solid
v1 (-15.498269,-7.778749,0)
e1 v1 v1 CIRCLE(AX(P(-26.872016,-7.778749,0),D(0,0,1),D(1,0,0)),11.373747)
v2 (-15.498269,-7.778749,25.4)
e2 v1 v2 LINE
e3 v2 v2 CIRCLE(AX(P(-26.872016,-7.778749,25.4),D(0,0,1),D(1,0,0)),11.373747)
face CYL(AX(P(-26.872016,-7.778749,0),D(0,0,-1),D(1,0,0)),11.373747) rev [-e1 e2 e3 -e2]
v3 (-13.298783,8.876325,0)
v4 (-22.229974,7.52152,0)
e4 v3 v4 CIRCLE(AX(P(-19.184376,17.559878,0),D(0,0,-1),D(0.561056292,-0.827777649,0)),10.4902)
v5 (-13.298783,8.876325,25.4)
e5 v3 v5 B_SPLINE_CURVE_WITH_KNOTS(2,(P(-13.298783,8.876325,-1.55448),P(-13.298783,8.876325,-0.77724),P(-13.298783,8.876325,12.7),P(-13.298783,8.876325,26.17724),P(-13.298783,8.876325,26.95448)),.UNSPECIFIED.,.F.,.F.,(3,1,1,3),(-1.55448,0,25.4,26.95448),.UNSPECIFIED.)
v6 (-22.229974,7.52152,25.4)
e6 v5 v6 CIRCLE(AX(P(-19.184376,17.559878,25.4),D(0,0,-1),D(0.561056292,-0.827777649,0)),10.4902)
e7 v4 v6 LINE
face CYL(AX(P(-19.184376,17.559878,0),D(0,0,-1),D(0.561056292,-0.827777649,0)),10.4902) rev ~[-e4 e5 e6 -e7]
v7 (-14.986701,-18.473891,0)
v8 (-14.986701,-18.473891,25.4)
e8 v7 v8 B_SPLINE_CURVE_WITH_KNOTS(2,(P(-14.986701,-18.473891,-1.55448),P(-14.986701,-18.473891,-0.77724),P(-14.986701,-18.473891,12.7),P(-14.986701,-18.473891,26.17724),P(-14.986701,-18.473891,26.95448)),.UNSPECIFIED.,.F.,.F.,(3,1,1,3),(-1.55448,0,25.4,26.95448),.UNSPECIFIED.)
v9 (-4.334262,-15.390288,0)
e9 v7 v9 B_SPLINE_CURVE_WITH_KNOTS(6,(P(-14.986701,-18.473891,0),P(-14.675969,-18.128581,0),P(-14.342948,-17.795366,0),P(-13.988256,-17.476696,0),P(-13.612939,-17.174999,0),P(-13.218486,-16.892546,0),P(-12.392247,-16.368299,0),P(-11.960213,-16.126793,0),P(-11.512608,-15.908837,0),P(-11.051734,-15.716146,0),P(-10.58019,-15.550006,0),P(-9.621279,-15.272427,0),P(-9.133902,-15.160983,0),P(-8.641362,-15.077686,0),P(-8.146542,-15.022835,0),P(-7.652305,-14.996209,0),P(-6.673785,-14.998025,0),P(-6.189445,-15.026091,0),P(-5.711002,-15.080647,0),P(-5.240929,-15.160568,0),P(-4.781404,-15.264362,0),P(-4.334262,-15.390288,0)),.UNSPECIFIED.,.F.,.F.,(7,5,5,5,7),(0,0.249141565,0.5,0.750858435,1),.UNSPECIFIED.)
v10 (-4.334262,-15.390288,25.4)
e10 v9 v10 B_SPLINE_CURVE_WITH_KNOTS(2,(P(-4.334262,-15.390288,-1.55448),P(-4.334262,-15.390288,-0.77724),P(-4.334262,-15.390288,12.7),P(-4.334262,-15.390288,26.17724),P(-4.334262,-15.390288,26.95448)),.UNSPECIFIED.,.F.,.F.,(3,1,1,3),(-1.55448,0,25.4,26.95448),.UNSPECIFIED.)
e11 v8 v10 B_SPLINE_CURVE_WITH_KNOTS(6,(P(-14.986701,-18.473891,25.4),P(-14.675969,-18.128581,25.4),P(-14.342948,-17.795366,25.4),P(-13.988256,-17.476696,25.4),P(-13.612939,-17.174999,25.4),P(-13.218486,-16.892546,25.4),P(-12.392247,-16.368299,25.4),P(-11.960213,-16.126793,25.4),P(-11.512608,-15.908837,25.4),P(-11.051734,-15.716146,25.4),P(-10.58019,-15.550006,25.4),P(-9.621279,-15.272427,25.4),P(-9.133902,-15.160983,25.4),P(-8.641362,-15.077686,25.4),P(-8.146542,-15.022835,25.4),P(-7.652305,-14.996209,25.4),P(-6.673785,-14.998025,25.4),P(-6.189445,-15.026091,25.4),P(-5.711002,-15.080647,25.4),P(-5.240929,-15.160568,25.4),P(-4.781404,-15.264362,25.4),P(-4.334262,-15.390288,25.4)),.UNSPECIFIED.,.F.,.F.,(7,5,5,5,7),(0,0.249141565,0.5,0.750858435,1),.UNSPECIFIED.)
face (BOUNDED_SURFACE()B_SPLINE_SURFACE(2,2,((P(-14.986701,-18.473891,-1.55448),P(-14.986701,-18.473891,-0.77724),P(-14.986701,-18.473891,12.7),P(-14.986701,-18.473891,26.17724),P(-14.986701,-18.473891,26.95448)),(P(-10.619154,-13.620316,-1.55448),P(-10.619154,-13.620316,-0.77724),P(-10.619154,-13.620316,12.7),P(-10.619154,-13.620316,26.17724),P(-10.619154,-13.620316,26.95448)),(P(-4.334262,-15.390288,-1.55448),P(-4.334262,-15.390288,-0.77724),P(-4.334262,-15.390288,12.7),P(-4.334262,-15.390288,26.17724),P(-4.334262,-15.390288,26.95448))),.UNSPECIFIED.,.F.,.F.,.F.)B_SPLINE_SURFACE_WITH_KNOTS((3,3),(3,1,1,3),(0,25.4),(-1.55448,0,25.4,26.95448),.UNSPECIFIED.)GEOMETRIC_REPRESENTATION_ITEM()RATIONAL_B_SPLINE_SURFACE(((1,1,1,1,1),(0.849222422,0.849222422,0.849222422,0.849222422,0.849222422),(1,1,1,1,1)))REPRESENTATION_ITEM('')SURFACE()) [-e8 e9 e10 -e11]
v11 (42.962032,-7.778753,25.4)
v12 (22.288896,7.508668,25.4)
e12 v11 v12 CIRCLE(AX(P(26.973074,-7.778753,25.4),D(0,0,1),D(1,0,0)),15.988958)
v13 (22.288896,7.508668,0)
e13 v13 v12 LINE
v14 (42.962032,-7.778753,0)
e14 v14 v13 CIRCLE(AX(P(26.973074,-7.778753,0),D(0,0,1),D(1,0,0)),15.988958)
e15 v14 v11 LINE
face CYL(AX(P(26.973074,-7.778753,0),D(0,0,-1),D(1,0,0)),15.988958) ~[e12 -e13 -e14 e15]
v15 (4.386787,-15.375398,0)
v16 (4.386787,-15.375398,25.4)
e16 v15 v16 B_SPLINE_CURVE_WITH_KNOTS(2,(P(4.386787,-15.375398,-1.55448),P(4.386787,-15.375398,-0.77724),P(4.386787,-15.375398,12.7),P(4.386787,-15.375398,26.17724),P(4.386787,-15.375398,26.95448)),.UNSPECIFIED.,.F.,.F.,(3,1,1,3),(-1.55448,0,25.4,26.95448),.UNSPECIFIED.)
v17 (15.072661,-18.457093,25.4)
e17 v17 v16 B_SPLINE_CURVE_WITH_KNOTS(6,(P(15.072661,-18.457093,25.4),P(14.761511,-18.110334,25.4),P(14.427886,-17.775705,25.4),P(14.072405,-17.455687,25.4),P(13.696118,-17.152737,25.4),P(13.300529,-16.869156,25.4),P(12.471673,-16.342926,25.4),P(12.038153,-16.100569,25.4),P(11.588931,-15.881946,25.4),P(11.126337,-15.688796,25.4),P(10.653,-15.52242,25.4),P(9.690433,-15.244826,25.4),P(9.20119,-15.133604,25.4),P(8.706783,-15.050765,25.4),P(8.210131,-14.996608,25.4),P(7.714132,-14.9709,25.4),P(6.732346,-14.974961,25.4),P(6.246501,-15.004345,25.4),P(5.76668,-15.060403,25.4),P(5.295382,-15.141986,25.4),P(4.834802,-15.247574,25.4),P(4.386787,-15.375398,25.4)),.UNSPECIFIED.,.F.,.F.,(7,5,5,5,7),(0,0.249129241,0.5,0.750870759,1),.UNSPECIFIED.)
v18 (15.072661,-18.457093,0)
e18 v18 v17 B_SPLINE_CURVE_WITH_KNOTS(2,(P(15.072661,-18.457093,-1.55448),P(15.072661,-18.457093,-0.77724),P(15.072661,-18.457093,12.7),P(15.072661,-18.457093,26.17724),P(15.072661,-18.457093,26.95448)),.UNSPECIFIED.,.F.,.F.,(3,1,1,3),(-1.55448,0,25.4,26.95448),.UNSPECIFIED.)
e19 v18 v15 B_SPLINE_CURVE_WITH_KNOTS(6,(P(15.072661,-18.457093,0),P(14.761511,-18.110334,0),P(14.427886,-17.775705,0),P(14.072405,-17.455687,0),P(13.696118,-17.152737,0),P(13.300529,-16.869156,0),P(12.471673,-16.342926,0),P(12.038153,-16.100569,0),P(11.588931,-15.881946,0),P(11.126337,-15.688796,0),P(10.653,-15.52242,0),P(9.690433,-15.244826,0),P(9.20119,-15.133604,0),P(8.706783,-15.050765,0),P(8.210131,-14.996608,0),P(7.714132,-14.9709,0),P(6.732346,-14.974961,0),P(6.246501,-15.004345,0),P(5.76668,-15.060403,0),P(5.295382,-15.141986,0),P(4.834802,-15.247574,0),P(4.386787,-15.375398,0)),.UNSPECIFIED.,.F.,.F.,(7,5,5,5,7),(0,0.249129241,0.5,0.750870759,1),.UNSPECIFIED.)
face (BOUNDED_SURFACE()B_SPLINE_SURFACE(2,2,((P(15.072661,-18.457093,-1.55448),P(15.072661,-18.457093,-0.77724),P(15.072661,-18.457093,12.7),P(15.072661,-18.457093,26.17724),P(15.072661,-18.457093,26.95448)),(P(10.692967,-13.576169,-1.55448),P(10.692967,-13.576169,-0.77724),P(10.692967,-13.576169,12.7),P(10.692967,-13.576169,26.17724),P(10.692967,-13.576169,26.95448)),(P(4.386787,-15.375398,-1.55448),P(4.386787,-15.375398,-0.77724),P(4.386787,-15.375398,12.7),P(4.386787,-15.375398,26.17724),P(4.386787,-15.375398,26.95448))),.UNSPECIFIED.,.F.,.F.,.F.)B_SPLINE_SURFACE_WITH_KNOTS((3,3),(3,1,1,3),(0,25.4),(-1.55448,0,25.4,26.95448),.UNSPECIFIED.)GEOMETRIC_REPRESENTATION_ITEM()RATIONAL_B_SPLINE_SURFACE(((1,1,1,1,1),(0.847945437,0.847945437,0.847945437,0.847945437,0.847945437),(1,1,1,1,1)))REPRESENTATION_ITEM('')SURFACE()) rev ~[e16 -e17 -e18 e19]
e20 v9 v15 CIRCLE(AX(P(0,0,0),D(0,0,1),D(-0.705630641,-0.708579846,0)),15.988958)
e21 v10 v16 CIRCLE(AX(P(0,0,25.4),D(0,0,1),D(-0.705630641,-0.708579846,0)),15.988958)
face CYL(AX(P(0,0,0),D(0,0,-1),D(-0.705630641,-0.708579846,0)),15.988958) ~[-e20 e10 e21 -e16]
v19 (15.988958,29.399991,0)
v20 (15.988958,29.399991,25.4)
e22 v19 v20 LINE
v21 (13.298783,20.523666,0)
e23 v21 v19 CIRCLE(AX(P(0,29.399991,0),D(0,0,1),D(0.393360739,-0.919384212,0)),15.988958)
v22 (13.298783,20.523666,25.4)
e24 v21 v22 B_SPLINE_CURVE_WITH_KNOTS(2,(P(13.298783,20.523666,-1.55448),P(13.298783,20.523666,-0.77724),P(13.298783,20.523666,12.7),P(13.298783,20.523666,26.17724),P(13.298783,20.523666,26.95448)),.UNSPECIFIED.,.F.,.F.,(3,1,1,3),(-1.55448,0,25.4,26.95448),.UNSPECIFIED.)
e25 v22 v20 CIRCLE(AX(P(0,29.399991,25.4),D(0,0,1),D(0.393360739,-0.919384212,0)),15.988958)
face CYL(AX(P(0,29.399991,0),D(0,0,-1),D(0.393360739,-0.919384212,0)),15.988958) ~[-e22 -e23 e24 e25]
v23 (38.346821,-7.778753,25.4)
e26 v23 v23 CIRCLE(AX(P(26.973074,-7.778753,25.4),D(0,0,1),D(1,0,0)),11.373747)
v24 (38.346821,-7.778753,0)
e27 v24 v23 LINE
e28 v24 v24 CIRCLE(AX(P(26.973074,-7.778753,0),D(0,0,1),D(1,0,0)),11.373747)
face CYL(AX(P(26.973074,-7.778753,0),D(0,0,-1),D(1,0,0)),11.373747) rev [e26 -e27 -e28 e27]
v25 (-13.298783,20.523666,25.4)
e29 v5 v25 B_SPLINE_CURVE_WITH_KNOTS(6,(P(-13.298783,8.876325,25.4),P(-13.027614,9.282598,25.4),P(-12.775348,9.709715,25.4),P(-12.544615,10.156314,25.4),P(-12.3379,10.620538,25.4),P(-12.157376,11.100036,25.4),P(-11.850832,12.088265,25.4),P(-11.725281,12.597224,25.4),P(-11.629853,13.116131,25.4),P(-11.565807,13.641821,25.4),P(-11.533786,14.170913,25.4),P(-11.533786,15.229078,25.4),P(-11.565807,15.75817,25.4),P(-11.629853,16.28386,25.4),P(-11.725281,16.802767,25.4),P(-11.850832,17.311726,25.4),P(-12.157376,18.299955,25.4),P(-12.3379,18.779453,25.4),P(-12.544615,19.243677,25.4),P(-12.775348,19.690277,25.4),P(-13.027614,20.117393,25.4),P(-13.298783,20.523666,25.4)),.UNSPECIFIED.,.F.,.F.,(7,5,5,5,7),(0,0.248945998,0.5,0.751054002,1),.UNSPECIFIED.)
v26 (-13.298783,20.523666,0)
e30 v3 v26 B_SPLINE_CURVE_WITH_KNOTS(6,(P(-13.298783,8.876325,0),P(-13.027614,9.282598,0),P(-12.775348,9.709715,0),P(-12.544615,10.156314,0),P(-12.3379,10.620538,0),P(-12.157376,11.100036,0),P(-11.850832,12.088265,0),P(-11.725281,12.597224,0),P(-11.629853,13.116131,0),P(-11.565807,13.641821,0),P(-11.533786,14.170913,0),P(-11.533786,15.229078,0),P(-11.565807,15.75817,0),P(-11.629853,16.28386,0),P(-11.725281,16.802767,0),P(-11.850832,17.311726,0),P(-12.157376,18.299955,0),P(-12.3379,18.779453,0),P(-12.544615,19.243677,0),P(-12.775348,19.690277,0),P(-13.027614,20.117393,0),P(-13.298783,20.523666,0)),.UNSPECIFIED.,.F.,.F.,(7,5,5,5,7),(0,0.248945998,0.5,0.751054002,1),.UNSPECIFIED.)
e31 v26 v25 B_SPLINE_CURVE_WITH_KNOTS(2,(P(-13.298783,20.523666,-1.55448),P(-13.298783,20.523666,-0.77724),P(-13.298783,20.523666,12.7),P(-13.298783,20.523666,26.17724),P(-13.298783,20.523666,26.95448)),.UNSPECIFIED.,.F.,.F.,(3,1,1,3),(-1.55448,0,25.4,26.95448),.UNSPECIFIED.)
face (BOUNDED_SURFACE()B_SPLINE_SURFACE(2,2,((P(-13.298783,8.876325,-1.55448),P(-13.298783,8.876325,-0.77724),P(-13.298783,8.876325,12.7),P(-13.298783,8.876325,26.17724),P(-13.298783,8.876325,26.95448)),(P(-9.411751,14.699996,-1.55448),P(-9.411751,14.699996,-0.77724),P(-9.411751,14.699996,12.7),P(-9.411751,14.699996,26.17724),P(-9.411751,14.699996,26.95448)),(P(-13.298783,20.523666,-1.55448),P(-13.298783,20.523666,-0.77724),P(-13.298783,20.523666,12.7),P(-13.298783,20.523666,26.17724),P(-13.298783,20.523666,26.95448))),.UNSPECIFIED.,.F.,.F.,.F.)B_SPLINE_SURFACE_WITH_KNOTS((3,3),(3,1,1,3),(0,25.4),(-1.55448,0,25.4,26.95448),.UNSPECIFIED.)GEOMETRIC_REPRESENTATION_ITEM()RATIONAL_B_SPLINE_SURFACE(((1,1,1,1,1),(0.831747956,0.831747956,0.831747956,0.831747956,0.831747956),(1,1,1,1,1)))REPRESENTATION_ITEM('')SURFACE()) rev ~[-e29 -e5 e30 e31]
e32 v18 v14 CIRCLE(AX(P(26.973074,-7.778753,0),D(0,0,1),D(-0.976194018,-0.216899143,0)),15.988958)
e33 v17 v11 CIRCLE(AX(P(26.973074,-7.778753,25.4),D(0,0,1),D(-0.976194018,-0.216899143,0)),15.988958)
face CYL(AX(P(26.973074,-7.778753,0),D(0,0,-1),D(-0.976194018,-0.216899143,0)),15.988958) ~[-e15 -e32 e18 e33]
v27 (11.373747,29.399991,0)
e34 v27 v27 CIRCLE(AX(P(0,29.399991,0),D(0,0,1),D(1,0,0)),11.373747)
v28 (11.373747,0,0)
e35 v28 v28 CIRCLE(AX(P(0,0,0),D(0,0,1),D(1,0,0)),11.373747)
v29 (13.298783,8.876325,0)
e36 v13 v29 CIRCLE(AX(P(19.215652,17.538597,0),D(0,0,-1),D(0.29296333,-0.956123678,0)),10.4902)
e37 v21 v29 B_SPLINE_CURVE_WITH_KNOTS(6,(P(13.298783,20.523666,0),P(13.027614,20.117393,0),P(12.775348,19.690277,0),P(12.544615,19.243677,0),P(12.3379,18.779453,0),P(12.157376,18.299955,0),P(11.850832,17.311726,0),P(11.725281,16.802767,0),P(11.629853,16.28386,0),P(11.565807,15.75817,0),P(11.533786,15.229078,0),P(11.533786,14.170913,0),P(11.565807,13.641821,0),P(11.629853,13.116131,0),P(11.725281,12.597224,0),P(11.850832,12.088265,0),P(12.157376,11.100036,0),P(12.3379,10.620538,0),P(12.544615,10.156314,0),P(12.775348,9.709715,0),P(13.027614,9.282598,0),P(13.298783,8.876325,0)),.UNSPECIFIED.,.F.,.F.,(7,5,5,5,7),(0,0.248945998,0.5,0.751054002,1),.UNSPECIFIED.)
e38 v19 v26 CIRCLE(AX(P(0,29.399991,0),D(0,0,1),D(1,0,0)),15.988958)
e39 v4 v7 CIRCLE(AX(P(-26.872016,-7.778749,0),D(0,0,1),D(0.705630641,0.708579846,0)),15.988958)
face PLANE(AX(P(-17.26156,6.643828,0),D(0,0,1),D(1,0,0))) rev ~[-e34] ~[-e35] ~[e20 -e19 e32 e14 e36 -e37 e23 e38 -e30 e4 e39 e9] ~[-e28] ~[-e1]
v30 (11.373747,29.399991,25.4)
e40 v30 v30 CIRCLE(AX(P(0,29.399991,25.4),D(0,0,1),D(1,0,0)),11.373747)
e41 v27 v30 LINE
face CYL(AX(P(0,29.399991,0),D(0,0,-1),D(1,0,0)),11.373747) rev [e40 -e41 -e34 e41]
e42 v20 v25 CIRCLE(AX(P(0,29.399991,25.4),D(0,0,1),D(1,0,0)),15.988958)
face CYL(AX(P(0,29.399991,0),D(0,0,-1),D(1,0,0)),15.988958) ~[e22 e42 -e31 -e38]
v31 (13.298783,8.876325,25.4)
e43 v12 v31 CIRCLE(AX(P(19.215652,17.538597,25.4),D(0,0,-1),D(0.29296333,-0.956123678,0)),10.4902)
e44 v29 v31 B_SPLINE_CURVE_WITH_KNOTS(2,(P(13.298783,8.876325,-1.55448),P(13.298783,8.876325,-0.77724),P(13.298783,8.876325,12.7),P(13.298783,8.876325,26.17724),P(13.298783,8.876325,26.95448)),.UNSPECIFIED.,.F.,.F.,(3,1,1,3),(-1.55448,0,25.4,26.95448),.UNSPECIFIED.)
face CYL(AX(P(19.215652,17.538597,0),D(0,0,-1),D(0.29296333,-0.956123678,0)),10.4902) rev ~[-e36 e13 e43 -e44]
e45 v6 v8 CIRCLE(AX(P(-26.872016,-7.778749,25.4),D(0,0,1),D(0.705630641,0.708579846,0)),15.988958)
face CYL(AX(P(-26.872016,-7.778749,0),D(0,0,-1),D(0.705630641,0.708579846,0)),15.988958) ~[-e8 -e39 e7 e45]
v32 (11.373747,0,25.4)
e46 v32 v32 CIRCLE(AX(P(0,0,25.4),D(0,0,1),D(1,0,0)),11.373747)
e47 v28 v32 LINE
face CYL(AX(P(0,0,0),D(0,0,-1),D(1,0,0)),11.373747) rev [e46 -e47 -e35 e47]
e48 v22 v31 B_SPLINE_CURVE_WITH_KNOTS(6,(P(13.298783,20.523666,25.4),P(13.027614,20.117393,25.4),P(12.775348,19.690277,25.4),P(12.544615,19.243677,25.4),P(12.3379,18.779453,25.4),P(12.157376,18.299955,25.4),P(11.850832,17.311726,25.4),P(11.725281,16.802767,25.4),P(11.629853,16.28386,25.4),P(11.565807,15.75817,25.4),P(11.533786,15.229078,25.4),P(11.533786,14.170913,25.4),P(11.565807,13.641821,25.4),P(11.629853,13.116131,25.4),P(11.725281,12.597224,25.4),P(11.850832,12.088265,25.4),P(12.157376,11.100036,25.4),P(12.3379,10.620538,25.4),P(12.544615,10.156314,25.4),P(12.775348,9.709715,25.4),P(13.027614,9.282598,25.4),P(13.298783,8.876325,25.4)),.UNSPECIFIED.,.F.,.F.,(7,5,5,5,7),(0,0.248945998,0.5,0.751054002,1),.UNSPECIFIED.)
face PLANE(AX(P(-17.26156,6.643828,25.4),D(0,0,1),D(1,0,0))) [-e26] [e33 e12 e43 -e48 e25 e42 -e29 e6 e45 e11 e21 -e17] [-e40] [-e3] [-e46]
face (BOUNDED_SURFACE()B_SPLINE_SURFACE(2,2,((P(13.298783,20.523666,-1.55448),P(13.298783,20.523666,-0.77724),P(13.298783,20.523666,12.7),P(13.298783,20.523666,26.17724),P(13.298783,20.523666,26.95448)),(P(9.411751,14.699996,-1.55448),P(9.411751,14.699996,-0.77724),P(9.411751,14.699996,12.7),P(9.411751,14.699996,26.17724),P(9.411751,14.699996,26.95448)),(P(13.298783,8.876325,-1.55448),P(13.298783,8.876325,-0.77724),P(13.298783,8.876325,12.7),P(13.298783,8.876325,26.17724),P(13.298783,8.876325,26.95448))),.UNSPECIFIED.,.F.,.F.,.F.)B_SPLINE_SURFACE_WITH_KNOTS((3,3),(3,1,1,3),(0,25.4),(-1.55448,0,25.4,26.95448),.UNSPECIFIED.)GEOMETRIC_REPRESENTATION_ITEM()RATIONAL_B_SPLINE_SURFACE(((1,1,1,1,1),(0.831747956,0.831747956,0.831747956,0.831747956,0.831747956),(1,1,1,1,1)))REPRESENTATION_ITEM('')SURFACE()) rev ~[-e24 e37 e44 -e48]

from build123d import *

# Parameters (mm, degrees)
F0_R        = 11.3737467854
F1_DEPTH    = 25.4
F2_R        = 10.5009772193
F3_R        = 10.4902
F4_R        = 10.4902
F5_T1_DEPTH = 25.4
F6_R        = 10.4902
F7_T1_DEPTH = 25.4


# Not quite as in the source:
# - a fillet or chamfer that OpenCascade refuses, or shapes differently, is made with other operations: its cross-section is extruded or revolved along the edge and cut away or added


with BuildPart() as f1:
    # F0 (on Top) → F1 (new body)
    with BuildSketch(Plane.XY):
        with BuildLine():
            ThreePointArc((6.2894283282, 14.6999955177), (13.345564471, 20.5941585441), (15.9889579684, 29.3999910355))
            ThreePointArc((15.9889579684, 29.3999910355), (-8.8058324914, 42.7455555065), (-6.2894283282, 14.6999955177))
            ThreePointArc((-6.2894283282, 14.6999955177), (0, 15.9889579684), (6.2894283282, 14.6999955177))
        make_face()
        with Locations((0, 29.3999910355)):
            Circle(F0_R, mode=Mode.SUBTRACT)
        with BuildLine():
            ThreePointArc((6.2894283282, 14.6999955177), (0, 13.411033067), (-6.2894283282, 14.6999955177))
            ThreePointArc((-6.2894283282, 14.6999955177), (-12.2780666284, 10.2418678368), (-15.5897168926, 3.5507047362))
            ThreePointArc((-15.5897168926, 3.5507047362), (-12.1065325646, -1.6446399909), (-10.8830575897, -7.7787486371))
            ThreePointArc((-10.8830575897, -7.7787486371), (-10.983181349, -9.5652884184), (-11.2822986655, -11.3294533733))
            ThreePointArc((-11.2822986655, -11.3294533733), (0.0583928669, -15.9888513405), (11.3647491723, -11.246744114))
            ThreePointArc((11.3647491723, -11.246744114), (11.6102118149, -3.3482637899), (15.6083251298, 3.467991286))
            ThreePointArc((15.6083251298, 3.467991286), (12.3051770158, 10.209279873), (6.2894283282, 14.6999955177))
        make_face()
        Circle(F0_R, mode=Mode.SUBTRACT)
        with BuildLine():
            ThreePointArc((42.9620322705, -7.778752828), (33.0532173957, 7.0090339191), (15.6083251298, 3.467991286))
            ThreePointArc((15.6083251298, 3.467991286), (15.893514894, 1.7444085615), (15.9889579684, 0))
            ThreePointArc((15.9889579684, 0), (14.7877867471, -6.0801430936), (11.3647491723, -11.246744114))
            ThreePointArc((11.3647491723, -11.246744114), (28.7174828636, -23.6722677221), (42.9620322705, -7.778752828))
        make_face()
        with Locations((26.9730743021, -7.778752828)):
            Circle(F0_R, mode=Mode.SUBTRACT)
        with BuildLine():
            ThreePointArc((-11.2822986655, -11.3294533733), (-15.3584205367, -4.4458627437), (-15.5897168926, 3.5507047362))
            ThreePointArc((-15.5897168926, 3.5507047362), (-42.2304360948, -12.2246113807), (-11.2822986655, -11.3294533733))
        make_face()
        with Locations((-26.8720155582, -7.7787486371)):
            Circle(F0_R, mode=Mode.SUBTRACT)
        with BuildLine():
            ThreePointArc((-10.8830575897, -7.7787486371), (-12.1065325646, -1.6446399909), (-15.5897168926, 3.5507047362))
            ThreePointArc((-15.5897168926, 3.5507047362), (-15.3584205367, -4.4458627437), (-11.2822986655, -11.3294533733))
            ThreePointArc((-11.2822986655, -11.3294533733), (-10.983181349, -9.5652884184), (-10.8830575897, -7.7787486371))
        make_face()
        with BuildLine():
            ThreePointArc((6.2894283282, 14.6999955177), (0, 15.9889579684), (-6.2894283282, 14.6999955177))
            ThreePointArc((-6.2894283282, 14.6999955177), (0, 13.411033067), (6.2894283282, 14.6999955177))
        make_face()
        with BuildLine():
            ThreePointArc((15.9889579684, 0), (15.893514894, 1.7444085615), (15.6083251298, 3.467991286))
            ThreePointArc((15.6083251298, 3.467991286), (11.6102118149, -3.3482637899), (11.3647491723, -11.246744114))
            ThreePointArc((11.3647491723, -11.246744114), (14.7877867471, -6.0801430936), (15.9889579684, 0))
        make_face()
    extrude(amount=F1_DEPTH)

    # F2
    f2_edges = [f1.edges().sort_by_distance(p)[0] for p in [
        (-11.282299, -11.329453, 12.7),
    ]]
    fillet(f2_edges, radius=F2_R)

    # F3
    f3_edges = [f1.edges().sort_by_distance(p)[0] for p in [
        (6.289428, 14.699996, 12.7),
    ]]
    fillet(f3_edges, radius=F3_R)

    # F4
    f4_edges = [f1.edges().sort_by_distance(p)[0] for p in [
        (11.364749, -11.246744, 12.7),
    ]]
    fillet(f4_edges, radius=F4_R)

    # F5: fillet of radius 10.4902 on 1 edges, made by hand

    # F5_s2 → F5_t1 (join)
    with BuildSketch(Plane.XY):
        with BuildLine():
            ThreePointArc((22.2888959377, 7.5086684708), (17.6379410744, 7.1677184148), (13.298783115, 8.8763249477))
            ThreePointArc((13.298783115, 8.8763249477), (14.7043444266, 6.2792540878), (15.6083251298, 3.467991286))
            ThreePointArc((15.6083251298, 3.467991286), (18.6981853725, 5.9023651862), (22.2888959377, 7.5086684708))
        make_face()
    extrude(amount=F5_T1_DEPTH)

    # F6
    f6_edges = [f1.edges().sort_by_distance(p)[0] for p in [
        (-6.289428, 14.699996, 12.7),
    ]]
    fillet(f6_edges, radius=F6_R)

    # F7: fillet of radius 10.4902 on 1 edges, made by hand

    # F7_s2 → F7_t1 (join)
    with BuildSketch(Plane.XY):
        with BuildLine():
            ThreePointArc((-13.298783115, 8.8763249477), (-17.6110780147, 7.1883289802), (-22.2299741232, 7.5215202571))
            ThreePointArc((-22.2299741232, 7.5215202571), (-18.6660423749, 5.9438160297), (-15.5897168926, 3.5507047362))
            ThreePointArc((-15.5897168926, 3.5507047362), (-14.6876450063, 6.3182166063), (-13.298783115, 8.8763249477))
        make_face()
    extrude(amount=F7_T1_DEPTH)


solid = f1.part
